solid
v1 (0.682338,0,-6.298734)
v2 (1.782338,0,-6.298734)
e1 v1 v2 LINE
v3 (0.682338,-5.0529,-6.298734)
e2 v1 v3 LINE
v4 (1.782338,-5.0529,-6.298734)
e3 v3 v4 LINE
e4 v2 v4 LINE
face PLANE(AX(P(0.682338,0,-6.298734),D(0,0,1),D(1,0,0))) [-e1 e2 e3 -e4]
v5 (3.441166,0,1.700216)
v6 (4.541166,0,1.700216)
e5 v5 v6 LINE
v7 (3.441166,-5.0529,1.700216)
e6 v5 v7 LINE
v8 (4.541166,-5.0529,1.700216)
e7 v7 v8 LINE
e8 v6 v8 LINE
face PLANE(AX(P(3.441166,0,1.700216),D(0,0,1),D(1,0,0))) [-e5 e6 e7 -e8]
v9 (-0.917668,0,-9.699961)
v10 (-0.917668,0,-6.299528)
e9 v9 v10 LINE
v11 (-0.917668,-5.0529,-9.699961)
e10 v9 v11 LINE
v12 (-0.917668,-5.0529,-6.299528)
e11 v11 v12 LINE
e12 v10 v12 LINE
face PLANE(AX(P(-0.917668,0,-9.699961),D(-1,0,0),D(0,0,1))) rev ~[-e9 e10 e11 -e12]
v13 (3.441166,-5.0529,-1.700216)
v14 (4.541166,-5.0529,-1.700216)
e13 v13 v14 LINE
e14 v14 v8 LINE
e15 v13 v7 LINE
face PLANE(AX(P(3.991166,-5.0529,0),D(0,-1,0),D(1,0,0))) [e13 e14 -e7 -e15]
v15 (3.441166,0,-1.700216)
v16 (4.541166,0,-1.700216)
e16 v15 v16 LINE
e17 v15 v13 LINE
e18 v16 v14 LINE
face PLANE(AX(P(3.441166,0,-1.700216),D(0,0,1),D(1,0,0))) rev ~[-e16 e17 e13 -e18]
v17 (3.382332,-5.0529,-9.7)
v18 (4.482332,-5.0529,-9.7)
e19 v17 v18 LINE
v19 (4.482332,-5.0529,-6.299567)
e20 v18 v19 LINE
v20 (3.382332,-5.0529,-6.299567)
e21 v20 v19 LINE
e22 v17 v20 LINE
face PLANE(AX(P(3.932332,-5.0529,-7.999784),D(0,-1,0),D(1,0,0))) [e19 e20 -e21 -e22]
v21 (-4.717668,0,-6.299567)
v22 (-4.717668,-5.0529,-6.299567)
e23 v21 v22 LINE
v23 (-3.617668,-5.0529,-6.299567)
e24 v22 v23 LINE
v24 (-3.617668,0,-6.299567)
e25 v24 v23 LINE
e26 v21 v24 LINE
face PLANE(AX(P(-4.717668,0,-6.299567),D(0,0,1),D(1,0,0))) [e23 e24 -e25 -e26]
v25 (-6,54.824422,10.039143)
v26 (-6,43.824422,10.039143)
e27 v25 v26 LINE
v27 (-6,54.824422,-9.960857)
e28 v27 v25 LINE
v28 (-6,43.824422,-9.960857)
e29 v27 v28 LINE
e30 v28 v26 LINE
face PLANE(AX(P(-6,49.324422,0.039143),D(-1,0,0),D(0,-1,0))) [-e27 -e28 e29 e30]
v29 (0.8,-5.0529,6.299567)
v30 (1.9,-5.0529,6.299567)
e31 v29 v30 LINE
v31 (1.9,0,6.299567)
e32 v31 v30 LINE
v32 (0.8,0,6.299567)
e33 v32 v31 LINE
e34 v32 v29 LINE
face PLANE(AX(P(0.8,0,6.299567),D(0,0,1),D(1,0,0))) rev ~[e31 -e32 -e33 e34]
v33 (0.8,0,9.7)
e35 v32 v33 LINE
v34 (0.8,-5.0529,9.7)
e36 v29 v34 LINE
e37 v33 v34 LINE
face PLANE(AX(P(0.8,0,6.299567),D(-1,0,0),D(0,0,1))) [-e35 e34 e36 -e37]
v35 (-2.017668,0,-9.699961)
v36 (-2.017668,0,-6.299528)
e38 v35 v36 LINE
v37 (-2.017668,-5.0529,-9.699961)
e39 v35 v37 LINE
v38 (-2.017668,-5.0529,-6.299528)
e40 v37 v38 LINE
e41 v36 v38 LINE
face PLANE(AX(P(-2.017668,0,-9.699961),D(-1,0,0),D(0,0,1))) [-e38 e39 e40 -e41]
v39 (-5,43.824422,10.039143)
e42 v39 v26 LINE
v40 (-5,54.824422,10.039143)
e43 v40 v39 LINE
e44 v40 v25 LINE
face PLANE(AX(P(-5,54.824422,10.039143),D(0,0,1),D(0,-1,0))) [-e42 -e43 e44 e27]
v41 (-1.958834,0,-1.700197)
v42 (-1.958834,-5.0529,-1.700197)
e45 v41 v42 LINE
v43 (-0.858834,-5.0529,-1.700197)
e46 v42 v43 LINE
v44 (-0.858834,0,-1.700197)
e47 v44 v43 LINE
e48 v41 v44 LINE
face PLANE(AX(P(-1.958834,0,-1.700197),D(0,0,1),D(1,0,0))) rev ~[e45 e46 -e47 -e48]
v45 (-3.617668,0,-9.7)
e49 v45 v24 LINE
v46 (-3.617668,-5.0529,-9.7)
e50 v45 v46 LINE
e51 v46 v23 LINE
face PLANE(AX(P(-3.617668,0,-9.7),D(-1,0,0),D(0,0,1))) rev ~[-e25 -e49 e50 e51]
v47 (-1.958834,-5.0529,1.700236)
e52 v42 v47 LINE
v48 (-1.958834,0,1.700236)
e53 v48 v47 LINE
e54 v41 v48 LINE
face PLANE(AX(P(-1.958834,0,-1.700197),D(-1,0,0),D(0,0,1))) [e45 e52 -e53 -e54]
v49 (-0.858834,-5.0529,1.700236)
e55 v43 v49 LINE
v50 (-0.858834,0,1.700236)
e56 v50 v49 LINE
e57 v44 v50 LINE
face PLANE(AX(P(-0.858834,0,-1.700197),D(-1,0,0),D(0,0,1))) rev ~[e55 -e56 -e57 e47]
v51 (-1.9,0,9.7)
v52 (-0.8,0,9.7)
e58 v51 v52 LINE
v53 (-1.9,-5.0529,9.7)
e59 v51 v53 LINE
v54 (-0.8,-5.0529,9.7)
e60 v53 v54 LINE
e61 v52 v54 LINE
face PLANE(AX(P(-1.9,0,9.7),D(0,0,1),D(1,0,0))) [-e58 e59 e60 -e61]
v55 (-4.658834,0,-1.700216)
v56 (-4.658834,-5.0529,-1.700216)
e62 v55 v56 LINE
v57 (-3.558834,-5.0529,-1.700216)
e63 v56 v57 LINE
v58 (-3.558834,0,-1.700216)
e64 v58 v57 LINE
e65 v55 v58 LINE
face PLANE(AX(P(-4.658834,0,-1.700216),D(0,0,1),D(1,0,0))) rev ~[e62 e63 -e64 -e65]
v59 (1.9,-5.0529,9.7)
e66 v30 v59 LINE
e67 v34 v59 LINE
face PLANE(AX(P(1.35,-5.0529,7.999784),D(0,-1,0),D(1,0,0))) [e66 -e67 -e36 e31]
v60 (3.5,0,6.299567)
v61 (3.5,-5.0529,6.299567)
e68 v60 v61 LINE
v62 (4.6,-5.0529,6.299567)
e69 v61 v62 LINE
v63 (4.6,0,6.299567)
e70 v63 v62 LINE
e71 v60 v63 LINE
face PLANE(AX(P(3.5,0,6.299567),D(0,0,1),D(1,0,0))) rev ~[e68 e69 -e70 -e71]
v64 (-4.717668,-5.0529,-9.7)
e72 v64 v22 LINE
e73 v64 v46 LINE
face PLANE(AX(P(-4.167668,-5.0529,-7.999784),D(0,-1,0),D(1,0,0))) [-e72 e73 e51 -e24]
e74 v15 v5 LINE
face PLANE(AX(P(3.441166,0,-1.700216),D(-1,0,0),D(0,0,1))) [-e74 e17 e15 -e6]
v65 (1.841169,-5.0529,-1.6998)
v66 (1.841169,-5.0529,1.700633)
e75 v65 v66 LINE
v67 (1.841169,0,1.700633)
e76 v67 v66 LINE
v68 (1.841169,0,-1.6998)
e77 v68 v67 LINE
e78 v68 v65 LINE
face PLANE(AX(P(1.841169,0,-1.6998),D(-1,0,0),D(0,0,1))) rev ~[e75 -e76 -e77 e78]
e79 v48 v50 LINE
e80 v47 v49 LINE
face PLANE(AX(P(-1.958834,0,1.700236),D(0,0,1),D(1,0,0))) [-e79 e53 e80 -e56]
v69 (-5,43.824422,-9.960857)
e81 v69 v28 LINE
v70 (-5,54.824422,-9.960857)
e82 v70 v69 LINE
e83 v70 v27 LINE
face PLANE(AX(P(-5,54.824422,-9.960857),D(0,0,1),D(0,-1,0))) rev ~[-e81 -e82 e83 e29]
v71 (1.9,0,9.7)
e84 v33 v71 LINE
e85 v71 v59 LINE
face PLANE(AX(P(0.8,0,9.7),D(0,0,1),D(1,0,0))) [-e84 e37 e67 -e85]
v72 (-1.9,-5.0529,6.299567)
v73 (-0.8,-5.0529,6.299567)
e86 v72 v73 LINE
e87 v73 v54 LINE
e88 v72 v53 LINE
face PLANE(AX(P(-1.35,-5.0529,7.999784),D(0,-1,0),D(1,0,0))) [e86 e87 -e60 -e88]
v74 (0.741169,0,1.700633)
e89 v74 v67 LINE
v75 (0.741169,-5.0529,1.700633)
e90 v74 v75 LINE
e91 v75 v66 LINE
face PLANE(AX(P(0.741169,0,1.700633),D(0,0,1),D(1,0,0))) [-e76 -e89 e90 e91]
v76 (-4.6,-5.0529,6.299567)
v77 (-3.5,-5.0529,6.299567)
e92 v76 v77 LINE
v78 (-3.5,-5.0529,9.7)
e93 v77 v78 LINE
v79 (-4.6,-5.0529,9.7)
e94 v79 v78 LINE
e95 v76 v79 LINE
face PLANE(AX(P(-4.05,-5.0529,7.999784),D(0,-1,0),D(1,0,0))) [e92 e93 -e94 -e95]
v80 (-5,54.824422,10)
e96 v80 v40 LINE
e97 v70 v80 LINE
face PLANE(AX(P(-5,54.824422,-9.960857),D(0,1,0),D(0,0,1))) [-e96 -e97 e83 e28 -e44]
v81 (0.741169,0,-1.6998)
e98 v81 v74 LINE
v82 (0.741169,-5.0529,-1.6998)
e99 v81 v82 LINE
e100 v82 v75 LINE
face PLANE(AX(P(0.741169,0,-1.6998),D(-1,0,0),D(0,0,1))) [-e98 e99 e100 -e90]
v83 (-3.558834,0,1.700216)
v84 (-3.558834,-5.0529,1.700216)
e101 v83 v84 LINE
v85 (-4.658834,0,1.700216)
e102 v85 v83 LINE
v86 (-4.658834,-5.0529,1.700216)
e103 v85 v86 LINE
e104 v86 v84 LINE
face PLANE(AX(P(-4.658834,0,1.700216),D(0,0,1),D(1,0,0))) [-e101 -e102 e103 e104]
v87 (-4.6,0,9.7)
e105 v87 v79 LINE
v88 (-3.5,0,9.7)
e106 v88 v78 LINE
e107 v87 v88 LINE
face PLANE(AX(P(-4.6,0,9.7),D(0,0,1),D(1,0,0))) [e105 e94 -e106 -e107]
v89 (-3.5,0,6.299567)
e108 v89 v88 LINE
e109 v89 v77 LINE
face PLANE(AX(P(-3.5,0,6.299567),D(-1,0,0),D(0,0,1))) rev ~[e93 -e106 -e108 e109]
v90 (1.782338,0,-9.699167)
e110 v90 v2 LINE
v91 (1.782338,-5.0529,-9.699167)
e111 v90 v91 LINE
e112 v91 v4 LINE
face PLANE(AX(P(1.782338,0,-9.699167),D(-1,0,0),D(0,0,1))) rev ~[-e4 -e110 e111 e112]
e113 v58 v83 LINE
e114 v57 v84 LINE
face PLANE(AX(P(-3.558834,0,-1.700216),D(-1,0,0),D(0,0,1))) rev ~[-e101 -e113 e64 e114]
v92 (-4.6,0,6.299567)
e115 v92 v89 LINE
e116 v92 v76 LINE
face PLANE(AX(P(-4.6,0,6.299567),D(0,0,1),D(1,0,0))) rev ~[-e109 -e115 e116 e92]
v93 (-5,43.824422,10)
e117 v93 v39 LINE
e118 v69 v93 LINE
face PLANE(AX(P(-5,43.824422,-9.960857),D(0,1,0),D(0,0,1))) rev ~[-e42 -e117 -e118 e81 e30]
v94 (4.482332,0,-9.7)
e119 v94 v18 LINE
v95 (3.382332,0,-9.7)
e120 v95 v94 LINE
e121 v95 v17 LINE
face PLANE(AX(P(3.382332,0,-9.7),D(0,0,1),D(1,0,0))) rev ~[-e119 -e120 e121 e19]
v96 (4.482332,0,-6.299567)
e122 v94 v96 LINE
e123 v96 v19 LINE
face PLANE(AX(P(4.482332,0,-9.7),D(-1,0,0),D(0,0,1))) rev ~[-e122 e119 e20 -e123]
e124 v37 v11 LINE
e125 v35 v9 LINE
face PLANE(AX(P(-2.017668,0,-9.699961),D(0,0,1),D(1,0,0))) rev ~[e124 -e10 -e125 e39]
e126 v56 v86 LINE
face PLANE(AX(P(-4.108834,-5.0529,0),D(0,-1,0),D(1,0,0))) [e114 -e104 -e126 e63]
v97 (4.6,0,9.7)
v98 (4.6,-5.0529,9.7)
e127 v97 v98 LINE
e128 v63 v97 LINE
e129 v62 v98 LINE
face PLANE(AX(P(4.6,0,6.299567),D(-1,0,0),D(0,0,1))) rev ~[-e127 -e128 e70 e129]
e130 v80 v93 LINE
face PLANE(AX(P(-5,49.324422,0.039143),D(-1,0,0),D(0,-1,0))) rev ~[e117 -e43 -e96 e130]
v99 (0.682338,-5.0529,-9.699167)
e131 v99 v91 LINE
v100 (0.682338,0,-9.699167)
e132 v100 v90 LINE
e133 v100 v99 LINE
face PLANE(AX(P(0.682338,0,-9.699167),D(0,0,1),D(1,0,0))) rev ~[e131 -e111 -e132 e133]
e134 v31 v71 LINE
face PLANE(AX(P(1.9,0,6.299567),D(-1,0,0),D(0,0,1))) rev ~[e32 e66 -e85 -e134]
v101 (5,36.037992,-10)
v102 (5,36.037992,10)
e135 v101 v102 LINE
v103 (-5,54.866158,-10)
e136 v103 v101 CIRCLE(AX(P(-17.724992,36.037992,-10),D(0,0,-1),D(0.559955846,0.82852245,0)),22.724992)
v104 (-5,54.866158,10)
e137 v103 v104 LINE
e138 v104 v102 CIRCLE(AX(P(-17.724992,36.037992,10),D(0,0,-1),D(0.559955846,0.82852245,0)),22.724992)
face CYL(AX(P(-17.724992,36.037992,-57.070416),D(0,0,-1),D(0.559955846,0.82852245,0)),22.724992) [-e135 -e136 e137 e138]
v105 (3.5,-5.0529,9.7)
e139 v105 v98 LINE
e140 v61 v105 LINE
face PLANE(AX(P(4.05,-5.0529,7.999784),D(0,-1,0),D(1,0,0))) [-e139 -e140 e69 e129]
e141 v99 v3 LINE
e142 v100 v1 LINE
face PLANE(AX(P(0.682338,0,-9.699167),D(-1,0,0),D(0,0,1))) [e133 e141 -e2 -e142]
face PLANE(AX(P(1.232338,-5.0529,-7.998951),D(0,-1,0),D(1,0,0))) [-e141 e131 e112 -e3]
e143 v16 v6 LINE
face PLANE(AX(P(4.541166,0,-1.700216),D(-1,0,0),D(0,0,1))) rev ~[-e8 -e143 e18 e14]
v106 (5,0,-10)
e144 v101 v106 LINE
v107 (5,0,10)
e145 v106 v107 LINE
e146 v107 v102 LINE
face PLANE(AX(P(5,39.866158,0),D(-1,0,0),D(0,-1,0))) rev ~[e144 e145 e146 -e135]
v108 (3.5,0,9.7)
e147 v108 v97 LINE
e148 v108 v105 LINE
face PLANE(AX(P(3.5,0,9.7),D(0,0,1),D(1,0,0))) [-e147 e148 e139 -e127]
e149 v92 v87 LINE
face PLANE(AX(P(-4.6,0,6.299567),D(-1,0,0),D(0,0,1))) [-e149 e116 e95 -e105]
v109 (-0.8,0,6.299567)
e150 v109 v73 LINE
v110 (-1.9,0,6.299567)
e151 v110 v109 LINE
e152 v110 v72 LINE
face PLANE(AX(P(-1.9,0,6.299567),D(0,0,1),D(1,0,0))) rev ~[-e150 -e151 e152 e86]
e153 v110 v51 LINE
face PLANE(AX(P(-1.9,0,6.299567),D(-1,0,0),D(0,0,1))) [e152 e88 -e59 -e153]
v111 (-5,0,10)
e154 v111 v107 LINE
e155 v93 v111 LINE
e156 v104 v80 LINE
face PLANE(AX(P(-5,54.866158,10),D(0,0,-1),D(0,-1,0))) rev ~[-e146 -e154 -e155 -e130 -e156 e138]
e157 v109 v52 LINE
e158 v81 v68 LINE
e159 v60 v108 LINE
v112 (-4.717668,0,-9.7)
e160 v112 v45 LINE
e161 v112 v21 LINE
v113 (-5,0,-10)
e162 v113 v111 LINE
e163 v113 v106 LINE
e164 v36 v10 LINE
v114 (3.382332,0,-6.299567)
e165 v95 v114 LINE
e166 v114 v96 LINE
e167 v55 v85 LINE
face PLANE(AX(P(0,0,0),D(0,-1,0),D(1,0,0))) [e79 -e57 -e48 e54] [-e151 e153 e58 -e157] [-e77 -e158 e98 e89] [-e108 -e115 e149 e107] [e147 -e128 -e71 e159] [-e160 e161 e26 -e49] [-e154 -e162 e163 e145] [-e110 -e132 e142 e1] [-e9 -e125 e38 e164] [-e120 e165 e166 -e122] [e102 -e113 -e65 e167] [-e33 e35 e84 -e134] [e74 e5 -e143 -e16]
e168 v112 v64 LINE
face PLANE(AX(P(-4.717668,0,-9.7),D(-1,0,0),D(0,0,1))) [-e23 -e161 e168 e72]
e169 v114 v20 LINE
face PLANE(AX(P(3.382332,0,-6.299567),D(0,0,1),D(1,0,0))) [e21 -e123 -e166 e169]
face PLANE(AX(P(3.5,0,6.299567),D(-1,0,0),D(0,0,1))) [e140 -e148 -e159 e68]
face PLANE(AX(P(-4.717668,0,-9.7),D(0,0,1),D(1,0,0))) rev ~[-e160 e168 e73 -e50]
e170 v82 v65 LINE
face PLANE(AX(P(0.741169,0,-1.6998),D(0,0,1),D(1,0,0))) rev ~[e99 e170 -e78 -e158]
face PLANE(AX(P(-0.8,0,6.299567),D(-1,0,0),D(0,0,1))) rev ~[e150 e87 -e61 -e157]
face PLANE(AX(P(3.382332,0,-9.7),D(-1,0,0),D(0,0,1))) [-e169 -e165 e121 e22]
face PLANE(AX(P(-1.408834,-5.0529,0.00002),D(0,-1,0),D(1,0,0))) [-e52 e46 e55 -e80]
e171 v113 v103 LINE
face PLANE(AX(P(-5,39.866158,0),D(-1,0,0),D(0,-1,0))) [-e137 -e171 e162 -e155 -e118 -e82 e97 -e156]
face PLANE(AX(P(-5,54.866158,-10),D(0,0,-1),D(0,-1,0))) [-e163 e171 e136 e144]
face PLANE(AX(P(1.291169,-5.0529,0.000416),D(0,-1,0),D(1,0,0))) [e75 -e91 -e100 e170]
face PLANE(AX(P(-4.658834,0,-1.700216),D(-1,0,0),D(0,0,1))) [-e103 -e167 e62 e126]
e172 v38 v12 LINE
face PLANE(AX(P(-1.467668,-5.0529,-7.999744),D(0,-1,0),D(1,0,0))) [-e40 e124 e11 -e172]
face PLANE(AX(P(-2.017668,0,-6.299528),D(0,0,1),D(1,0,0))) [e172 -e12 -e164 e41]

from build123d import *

# Parameters (mm, degrees)
F0_W        = 10
F0_H        = 20
F1_DEPTH    = 25
F3_W        = 30
F3_H        = 20
F4_DEPTH    = 10
F5_T1_DEPTH = 114.1408313715
F6_W        = 11
F6_H        = 20
F7_DEPTH    = 1
F8_W        = 1.1
F8_H        = 3.4004326878
F9_DEPTH    = 5.0529


# Not quite as in the source:
# - a fillet or chamfer that OpenCascade refuses, or shapes differently, is made with other operations: its cross-section is extruded or revolved along the edge and cut away or added


with BuildPart() as f1:
    # F0 (on Front) → F1 (new body)
    with BuildSketch(Plane.XZ):
        Rectangle(F0_W, F0_H)
    extrude(amount=-F1_DEPTH)

    # F3 (on face) → F4 (join)
    with BuildSketch(Plane(origin=(-5, 0, 0), x_dir=(0, -1, 0), z_dir=(-1, 0, 0))):
        with Locations((-39.8661582013, 0)):
            Rectangle(F3_W, F3_H)
    extrude(amount=-F4_DEPTH)

    # F5: fillet of radius 22.7249922626 on 1 edges, made by hand

    # F5_s2 → F5_t1 (cut)
    with BuildSketch(Plane.XY.offset(-57.0704156857)):
        with BuildLine():
            ThreePointArc((-5, 54.8661582013), (2.3448934377, 46.697492915), (5, 36.037991927))
            Line((5, 36.037991927), (5, 54.8661582013))
            Line((5, 54.8661582013), (-5, 54.8661582013))
        make_face()
    extrude(amount=F5_T1_DEPTH, mode=Mode.SUBTRACT)

    # F6 (on face) → F7 (join)
    with BuildSketch(Plane(origin=(-5, 0, 0), x_dir=(0, -1, 0), z_dir=(-1, 0, 0))):
        with Locations((-49.3244222254, 0.0391426826)):
            Rectangle(F6_W, F6_H)
    extrude(amount=F7_DEPTH)

    # F8 (on face) → F9 (join)
    with BuildSketch(Plane.XZ):
        with Locations((-4.05, 7.9997836561)):
            Rectangle(F8_W, F8_H)
        with Locations((-1.35, 7.9997836561)):
            Rectangle(F8_W, F8_H)
        with Locations((1.35, 7.9997836561)):
            Rectangle(F8_W, F8_H)
        with Locations((4.05, 7.9997836561)):
            Rectangle(F8_W, F8_H)
        with Locations((-4.1088341387, 0)):
            Rectangle(F8_W, F8_H)
        with Locations((-4.1676682773, -7.9997836561)):
            Rectangle(F8_W, F8_H)
        with Locations((-1.4088339935, 1.97401e-05)):
            Rectangle(F8_W, F8_H)
        with Locations((-1.467667987, -7.9997441759)):
            Rectangle(F8_W, F8_H)
        with Locations((1.2911689242, 0.0004164637)):
            Rectangle(F8_W, F8_H)
        with Locations((1.2323378484, -7.9989507287)):
            Rectangle(F8_W, F8_H)
        with Locations((3.9911658613, 0)):
            Rectangle(F8_W, F8_H)
        with Locations((3.9323317227, -7.9997836561)):
            Rectangle(F8_W, F8_H)
    extrude(amount=F9_DEPTH)


solid = f1.part
